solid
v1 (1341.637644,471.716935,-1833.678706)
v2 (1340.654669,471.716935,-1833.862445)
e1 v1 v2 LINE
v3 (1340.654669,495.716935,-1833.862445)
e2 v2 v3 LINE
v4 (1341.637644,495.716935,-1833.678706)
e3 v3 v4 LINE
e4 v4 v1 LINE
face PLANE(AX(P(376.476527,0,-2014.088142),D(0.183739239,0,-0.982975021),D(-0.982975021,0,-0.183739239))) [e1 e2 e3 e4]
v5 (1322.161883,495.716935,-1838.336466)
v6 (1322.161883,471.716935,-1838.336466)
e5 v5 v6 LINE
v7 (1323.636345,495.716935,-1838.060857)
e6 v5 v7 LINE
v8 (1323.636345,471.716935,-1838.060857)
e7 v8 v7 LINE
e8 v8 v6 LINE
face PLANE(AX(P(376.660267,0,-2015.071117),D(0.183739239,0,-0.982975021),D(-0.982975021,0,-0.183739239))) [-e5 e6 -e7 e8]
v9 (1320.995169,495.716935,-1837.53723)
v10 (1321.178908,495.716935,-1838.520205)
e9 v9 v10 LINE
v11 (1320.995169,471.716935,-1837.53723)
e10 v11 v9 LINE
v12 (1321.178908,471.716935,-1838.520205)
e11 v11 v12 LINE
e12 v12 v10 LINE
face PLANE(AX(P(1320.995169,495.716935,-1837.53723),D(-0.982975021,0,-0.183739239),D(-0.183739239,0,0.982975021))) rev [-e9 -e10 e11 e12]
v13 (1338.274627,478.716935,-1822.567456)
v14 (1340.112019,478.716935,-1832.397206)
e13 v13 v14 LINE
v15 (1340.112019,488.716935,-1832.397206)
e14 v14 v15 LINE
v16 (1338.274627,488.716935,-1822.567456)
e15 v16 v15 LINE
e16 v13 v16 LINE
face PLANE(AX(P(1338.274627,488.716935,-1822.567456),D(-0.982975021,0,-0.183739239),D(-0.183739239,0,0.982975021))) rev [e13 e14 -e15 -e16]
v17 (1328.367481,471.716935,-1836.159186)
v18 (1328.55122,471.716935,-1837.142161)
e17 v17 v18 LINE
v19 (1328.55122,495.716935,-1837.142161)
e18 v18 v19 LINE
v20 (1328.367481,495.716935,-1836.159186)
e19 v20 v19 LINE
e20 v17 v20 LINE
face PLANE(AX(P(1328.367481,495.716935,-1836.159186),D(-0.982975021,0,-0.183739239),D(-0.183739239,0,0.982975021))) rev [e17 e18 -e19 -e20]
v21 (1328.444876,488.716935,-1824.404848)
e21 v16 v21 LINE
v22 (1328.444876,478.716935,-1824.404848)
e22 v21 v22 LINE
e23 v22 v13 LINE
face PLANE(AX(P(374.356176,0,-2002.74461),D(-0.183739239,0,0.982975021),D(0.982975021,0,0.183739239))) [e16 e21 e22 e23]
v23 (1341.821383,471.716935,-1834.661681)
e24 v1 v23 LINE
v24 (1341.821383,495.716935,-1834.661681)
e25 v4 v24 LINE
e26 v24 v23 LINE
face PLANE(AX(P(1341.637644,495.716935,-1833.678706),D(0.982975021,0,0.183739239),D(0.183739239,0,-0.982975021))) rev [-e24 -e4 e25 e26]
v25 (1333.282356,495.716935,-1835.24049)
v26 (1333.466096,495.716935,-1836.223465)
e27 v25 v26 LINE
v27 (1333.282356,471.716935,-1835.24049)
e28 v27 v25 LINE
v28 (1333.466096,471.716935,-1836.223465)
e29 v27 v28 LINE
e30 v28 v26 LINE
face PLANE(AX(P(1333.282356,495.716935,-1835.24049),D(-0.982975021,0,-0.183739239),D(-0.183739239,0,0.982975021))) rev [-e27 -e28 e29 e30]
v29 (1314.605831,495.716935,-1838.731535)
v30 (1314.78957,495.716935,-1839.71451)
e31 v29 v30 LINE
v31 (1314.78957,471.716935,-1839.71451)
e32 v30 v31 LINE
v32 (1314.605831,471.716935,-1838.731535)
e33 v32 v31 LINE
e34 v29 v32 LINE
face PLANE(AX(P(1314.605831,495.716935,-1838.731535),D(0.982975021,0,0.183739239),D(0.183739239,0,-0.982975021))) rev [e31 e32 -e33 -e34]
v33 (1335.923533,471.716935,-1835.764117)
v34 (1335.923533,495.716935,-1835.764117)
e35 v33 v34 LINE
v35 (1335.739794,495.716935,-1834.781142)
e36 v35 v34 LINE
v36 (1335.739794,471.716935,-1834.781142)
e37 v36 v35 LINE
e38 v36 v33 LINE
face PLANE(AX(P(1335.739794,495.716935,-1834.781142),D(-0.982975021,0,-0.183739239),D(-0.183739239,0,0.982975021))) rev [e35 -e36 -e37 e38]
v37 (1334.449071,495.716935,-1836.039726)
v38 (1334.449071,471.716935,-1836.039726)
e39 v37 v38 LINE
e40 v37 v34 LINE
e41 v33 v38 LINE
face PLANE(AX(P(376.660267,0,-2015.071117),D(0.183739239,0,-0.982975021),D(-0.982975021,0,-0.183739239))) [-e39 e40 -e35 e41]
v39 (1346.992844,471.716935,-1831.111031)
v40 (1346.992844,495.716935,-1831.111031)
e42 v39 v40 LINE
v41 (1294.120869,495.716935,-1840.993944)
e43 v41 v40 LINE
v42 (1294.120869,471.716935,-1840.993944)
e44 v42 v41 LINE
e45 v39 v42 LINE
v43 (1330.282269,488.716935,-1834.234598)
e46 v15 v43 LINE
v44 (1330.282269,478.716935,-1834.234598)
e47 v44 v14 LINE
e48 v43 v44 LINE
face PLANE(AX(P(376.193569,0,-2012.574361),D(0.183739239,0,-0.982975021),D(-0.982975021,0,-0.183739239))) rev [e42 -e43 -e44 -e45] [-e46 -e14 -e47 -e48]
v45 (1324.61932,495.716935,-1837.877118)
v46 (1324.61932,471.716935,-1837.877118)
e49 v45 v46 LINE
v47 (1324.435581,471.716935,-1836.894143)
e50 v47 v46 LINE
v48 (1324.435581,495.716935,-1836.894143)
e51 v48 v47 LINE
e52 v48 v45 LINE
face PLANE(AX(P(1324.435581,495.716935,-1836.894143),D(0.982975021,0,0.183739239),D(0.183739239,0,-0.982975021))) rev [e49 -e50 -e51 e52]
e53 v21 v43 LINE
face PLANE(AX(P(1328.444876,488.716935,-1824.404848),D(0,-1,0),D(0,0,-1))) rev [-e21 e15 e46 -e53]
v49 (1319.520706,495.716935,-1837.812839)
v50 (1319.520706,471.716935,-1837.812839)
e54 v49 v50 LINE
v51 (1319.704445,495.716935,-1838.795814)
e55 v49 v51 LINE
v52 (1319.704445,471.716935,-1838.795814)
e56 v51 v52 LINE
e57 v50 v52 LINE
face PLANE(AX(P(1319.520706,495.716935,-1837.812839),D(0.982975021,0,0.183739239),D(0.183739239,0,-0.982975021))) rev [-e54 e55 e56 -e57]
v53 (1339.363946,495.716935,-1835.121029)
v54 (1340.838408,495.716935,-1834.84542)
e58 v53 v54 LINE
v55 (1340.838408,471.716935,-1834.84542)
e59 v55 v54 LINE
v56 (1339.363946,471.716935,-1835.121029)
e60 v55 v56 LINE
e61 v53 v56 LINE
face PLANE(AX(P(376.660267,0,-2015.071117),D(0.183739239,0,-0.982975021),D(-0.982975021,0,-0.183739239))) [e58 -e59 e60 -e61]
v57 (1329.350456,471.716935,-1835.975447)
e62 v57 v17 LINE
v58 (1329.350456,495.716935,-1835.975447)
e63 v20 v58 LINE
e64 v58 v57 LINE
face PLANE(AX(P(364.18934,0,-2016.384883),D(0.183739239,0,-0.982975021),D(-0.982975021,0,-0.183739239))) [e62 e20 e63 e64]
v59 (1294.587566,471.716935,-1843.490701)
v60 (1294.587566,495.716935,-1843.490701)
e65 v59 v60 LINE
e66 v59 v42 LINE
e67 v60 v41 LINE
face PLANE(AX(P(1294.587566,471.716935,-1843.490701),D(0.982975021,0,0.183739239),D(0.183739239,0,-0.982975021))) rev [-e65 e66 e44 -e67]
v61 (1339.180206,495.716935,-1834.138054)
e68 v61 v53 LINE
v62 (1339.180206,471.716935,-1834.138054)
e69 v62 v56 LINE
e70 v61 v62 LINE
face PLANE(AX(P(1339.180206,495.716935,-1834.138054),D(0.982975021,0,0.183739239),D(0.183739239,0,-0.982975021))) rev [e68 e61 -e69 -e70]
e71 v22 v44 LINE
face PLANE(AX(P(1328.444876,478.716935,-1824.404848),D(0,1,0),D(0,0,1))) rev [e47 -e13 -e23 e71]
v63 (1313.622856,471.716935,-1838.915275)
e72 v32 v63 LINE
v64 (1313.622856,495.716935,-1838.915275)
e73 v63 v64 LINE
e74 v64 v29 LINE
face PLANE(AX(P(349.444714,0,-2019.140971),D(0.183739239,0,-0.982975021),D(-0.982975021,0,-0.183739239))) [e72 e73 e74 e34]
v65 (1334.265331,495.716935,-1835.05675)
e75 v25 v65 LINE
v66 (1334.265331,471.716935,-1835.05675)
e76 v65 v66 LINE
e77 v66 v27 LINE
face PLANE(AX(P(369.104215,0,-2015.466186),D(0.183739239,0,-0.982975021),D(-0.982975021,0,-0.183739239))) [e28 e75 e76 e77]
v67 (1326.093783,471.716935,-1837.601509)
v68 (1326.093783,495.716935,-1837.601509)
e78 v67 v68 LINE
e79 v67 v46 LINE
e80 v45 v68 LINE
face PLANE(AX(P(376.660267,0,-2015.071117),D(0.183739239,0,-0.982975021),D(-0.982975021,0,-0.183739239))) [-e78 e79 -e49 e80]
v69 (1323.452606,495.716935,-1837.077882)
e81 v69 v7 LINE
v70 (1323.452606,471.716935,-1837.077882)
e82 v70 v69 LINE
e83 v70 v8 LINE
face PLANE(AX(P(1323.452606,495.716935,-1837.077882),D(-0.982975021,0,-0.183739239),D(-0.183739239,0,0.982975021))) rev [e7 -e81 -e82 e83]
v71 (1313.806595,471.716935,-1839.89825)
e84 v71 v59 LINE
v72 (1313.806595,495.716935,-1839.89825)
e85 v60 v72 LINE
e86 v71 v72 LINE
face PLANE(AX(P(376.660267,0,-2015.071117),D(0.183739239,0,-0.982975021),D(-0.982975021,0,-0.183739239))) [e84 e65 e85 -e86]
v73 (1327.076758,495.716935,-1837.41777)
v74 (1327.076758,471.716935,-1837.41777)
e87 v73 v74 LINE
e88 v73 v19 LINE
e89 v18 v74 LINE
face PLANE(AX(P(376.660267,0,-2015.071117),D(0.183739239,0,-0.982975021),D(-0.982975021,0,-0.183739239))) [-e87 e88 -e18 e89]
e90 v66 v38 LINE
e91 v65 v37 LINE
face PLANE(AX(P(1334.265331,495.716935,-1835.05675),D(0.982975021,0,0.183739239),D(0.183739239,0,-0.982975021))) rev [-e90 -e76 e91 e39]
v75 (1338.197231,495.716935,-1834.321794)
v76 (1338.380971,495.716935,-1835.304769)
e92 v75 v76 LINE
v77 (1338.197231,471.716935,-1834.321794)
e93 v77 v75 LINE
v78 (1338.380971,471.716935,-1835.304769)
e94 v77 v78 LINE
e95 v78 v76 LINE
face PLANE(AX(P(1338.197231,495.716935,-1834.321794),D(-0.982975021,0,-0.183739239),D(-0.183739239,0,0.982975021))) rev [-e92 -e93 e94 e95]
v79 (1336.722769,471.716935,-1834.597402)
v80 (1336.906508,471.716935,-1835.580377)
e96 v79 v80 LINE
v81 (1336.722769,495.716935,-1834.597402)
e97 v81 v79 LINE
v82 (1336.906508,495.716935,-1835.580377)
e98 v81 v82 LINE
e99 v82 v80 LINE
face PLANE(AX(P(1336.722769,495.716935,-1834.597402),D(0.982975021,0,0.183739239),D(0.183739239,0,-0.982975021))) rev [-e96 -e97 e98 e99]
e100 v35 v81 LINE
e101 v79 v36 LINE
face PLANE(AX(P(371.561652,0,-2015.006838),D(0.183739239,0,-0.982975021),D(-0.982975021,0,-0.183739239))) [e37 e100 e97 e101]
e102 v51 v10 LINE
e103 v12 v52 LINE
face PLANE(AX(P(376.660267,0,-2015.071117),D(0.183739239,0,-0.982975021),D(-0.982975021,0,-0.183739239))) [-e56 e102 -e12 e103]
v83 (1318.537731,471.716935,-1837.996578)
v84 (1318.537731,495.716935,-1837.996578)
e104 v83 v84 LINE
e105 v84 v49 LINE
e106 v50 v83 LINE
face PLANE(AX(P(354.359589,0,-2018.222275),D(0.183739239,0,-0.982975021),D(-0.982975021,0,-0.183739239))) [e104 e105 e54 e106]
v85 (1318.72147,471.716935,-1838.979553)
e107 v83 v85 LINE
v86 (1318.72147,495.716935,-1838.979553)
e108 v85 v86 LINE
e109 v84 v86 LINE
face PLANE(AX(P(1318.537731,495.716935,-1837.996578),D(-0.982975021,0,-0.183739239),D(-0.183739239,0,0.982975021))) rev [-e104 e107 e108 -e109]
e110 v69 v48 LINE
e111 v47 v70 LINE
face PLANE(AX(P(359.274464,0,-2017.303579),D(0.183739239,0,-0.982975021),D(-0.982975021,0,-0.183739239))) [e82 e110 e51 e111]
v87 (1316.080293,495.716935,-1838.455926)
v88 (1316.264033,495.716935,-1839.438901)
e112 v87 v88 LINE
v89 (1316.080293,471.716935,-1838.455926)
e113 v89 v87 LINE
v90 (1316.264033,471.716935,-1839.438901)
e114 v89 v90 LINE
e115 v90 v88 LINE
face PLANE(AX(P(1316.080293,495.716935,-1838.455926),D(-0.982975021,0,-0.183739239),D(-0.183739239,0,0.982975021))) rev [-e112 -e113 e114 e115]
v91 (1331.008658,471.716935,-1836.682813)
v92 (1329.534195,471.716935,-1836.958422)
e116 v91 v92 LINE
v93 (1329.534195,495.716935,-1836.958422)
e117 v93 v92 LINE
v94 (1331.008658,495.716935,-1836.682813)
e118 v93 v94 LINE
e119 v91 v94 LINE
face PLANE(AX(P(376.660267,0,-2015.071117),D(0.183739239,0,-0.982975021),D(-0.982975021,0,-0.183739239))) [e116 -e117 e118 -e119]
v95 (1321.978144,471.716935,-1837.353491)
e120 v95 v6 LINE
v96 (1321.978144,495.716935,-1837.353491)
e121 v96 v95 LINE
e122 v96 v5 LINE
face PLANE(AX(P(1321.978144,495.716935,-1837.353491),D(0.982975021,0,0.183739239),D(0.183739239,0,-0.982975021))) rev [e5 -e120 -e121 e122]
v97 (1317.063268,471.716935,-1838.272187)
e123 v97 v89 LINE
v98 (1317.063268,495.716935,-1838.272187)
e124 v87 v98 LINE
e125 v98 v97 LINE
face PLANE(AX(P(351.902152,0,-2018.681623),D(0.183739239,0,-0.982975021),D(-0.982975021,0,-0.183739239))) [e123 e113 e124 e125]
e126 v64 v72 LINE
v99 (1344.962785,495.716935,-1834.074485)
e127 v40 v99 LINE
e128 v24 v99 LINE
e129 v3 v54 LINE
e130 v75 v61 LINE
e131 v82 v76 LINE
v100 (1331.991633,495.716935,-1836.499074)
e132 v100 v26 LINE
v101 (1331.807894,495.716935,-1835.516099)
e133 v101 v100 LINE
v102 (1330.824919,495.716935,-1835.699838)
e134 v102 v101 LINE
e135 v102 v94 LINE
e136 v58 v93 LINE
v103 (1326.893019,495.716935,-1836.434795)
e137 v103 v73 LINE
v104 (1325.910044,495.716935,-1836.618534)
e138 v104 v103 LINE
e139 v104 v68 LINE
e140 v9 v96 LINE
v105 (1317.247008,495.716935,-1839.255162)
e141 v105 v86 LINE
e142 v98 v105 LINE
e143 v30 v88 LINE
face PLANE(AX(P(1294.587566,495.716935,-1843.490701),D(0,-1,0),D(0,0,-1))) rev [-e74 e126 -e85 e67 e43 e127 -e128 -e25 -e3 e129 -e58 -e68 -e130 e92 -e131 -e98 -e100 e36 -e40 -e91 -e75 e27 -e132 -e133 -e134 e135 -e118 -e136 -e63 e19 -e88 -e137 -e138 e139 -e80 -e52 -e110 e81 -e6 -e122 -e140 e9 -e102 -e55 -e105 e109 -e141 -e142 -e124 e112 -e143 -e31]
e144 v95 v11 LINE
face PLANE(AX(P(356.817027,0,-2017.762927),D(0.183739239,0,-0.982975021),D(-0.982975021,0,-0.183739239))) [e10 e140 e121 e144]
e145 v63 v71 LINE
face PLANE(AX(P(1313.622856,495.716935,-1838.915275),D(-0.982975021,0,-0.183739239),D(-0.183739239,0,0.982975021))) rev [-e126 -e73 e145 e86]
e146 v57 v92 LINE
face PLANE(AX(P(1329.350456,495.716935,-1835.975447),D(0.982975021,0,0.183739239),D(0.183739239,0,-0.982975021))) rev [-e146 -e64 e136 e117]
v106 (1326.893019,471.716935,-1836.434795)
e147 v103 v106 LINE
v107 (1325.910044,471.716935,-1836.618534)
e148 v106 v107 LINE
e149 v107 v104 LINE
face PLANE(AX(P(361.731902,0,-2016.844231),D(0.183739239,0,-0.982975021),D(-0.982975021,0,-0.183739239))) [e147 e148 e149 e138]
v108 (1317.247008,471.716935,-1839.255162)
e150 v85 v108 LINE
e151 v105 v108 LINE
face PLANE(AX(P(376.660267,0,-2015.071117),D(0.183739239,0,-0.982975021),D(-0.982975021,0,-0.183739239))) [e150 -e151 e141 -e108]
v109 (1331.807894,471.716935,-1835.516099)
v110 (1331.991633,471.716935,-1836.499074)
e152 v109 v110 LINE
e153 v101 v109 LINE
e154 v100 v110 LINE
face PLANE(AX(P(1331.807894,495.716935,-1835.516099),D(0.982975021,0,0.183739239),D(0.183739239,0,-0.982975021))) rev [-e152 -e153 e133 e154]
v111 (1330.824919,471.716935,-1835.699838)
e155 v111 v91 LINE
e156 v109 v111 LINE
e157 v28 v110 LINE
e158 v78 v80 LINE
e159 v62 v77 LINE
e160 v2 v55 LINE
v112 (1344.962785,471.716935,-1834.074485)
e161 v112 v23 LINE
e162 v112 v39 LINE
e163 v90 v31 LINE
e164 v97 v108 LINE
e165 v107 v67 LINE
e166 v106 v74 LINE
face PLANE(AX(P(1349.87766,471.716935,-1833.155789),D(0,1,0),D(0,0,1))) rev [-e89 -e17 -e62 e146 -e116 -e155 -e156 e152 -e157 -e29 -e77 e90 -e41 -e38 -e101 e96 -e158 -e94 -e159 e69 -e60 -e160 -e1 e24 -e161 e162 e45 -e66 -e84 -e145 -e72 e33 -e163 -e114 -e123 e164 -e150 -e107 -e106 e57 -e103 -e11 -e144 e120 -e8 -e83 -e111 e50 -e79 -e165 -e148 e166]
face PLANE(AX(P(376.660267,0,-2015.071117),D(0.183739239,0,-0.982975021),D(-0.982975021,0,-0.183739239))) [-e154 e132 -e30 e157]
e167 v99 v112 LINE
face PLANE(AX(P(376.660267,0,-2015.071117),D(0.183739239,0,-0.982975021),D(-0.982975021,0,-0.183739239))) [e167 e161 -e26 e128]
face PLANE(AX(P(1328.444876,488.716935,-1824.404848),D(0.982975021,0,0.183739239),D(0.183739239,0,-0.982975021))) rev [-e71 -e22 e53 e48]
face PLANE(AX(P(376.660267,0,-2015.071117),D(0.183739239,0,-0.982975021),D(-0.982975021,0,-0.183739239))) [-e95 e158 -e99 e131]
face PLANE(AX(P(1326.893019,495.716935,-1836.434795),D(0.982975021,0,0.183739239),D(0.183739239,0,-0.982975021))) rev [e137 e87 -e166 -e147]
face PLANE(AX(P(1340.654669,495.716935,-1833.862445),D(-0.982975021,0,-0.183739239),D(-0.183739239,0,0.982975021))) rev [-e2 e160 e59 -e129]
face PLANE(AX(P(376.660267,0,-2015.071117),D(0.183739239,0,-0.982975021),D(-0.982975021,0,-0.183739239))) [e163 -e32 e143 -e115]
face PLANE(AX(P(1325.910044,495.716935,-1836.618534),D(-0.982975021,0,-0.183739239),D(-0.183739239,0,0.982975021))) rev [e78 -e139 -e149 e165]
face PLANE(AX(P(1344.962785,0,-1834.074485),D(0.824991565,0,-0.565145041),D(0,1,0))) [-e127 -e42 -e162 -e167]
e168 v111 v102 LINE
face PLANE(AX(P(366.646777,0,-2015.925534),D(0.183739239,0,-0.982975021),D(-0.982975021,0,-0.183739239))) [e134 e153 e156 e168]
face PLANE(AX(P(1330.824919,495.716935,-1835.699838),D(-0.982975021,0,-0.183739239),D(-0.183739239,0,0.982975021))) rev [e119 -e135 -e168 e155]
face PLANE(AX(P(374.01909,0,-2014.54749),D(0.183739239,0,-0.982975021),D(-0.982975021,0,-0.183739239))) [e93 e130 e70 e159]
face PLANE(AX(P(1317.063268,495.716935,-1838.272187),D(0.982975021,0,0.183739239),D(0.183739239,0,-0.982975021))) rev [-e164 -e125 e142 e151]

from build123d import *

# Parameters (mm, degrees)
SKETCH1_W           = 56.247710146
SKETCH1_H           = 24
BOSS_EXTRUDE1_DEPTH = 2.54
CHAMFER1_SIZE       = 5
SKETCH2_W           = 1
SKETCH2_H           = 24
CUT_EXTRUDE1_DEPTH  = 1
LPATTERN1_COUNT     = 12
LPATTERN1_PITCH     = 2.5
SKETCH3_W           = 10
SKETCH3_H           = 10
BOSS_EXTRUDE2_DEPTH = 10


with BuildPart() as part:
    # Sketch1 → Boss-Extrude1 (new body)
    with BuildSketch(Plane(origin=(376.193568869, 0, -2012.574360527), x_dir=(-0.9829750210853586, 0, -0.183739238929084), z_dir=(0.183739238929084, 0, -0.9829750210853586))):
        with Locations((-961.949517112, 483.716935274)):
            Rectangle(SKETCH1_W, SKETCH1_H)
    extrude(amount=BOSS_EXTRUDE1_DEPTH)

    # Chamfer1
    # the kernel refuses this chamfer: 5 mm, written as the material it takes off along each edge
    with BuildSketch(Plane(origin=(1349.877660436, 508.575350214, -1833.155789191), x_dir=(-0.15664201033904618, 0, 0.987655446295388), z_dir=(0, -1, 0))) as chamfer1_piece_1:
        Polygon((CHAMFER1_SIZE * 0.999621916911, CHAMFER1_SIZE * 0.0274958766106), (-CHAMFER1_SIZE * 0.0274958766106, CHAMFER1_SIZE * 0.999621916911), (0, 0), align=None)
    extrude(amount=49.71682988, mode=Mode.SUBTRACT)

    # Sketch2 → Cut-Extrude1 (cut)
    with BuildSketch(Plane(origin=(376.660266536, 0, -2015.07111708), x_dir=(-0.9829750210853584, 0, -0.18373923892908509), z_dir=(0.18373923892908506, 0, -0.9829750210853583))):
        with Locations((-981.377561484, 483.716935274)):
            Rectangle(SKETCH2_W, SKETCH2_H)
    cut_extrude1 = extrude(amount=-CUT_EXTRUDE1_DEPTH, mode=Mode.SUBTRACT)

    # LPattern1: Cut-Extrude1 ×12
    with Locations(*[Vector(-0.9829750210853567, 0, -0.18373923892909338) * (i * LPATTERN1_PITCH) for i in range(1, LPATTERN1_COUNT)]):
        add(cut_extrude1, mode=Mode.SUBTRACT)

    # Sketch3 → Boss-Extrude2 (add)
    with BuildSketch(Plane(origin=(376.193568869, 0, -2012.574360527), x_dir=(0.9829750210853584, 0, 0.18373923892908509), z_dir=(-0.18373923892908506, 0, 0.9829750210853583))):
        with Locations((975.613372185, 483.716935274)):
            Rectangle(SKETCH3_W, SKETCH3_H)
    extrude(amount=BOSS_EXTRUDE2_DEPTH)


solid = part.part
